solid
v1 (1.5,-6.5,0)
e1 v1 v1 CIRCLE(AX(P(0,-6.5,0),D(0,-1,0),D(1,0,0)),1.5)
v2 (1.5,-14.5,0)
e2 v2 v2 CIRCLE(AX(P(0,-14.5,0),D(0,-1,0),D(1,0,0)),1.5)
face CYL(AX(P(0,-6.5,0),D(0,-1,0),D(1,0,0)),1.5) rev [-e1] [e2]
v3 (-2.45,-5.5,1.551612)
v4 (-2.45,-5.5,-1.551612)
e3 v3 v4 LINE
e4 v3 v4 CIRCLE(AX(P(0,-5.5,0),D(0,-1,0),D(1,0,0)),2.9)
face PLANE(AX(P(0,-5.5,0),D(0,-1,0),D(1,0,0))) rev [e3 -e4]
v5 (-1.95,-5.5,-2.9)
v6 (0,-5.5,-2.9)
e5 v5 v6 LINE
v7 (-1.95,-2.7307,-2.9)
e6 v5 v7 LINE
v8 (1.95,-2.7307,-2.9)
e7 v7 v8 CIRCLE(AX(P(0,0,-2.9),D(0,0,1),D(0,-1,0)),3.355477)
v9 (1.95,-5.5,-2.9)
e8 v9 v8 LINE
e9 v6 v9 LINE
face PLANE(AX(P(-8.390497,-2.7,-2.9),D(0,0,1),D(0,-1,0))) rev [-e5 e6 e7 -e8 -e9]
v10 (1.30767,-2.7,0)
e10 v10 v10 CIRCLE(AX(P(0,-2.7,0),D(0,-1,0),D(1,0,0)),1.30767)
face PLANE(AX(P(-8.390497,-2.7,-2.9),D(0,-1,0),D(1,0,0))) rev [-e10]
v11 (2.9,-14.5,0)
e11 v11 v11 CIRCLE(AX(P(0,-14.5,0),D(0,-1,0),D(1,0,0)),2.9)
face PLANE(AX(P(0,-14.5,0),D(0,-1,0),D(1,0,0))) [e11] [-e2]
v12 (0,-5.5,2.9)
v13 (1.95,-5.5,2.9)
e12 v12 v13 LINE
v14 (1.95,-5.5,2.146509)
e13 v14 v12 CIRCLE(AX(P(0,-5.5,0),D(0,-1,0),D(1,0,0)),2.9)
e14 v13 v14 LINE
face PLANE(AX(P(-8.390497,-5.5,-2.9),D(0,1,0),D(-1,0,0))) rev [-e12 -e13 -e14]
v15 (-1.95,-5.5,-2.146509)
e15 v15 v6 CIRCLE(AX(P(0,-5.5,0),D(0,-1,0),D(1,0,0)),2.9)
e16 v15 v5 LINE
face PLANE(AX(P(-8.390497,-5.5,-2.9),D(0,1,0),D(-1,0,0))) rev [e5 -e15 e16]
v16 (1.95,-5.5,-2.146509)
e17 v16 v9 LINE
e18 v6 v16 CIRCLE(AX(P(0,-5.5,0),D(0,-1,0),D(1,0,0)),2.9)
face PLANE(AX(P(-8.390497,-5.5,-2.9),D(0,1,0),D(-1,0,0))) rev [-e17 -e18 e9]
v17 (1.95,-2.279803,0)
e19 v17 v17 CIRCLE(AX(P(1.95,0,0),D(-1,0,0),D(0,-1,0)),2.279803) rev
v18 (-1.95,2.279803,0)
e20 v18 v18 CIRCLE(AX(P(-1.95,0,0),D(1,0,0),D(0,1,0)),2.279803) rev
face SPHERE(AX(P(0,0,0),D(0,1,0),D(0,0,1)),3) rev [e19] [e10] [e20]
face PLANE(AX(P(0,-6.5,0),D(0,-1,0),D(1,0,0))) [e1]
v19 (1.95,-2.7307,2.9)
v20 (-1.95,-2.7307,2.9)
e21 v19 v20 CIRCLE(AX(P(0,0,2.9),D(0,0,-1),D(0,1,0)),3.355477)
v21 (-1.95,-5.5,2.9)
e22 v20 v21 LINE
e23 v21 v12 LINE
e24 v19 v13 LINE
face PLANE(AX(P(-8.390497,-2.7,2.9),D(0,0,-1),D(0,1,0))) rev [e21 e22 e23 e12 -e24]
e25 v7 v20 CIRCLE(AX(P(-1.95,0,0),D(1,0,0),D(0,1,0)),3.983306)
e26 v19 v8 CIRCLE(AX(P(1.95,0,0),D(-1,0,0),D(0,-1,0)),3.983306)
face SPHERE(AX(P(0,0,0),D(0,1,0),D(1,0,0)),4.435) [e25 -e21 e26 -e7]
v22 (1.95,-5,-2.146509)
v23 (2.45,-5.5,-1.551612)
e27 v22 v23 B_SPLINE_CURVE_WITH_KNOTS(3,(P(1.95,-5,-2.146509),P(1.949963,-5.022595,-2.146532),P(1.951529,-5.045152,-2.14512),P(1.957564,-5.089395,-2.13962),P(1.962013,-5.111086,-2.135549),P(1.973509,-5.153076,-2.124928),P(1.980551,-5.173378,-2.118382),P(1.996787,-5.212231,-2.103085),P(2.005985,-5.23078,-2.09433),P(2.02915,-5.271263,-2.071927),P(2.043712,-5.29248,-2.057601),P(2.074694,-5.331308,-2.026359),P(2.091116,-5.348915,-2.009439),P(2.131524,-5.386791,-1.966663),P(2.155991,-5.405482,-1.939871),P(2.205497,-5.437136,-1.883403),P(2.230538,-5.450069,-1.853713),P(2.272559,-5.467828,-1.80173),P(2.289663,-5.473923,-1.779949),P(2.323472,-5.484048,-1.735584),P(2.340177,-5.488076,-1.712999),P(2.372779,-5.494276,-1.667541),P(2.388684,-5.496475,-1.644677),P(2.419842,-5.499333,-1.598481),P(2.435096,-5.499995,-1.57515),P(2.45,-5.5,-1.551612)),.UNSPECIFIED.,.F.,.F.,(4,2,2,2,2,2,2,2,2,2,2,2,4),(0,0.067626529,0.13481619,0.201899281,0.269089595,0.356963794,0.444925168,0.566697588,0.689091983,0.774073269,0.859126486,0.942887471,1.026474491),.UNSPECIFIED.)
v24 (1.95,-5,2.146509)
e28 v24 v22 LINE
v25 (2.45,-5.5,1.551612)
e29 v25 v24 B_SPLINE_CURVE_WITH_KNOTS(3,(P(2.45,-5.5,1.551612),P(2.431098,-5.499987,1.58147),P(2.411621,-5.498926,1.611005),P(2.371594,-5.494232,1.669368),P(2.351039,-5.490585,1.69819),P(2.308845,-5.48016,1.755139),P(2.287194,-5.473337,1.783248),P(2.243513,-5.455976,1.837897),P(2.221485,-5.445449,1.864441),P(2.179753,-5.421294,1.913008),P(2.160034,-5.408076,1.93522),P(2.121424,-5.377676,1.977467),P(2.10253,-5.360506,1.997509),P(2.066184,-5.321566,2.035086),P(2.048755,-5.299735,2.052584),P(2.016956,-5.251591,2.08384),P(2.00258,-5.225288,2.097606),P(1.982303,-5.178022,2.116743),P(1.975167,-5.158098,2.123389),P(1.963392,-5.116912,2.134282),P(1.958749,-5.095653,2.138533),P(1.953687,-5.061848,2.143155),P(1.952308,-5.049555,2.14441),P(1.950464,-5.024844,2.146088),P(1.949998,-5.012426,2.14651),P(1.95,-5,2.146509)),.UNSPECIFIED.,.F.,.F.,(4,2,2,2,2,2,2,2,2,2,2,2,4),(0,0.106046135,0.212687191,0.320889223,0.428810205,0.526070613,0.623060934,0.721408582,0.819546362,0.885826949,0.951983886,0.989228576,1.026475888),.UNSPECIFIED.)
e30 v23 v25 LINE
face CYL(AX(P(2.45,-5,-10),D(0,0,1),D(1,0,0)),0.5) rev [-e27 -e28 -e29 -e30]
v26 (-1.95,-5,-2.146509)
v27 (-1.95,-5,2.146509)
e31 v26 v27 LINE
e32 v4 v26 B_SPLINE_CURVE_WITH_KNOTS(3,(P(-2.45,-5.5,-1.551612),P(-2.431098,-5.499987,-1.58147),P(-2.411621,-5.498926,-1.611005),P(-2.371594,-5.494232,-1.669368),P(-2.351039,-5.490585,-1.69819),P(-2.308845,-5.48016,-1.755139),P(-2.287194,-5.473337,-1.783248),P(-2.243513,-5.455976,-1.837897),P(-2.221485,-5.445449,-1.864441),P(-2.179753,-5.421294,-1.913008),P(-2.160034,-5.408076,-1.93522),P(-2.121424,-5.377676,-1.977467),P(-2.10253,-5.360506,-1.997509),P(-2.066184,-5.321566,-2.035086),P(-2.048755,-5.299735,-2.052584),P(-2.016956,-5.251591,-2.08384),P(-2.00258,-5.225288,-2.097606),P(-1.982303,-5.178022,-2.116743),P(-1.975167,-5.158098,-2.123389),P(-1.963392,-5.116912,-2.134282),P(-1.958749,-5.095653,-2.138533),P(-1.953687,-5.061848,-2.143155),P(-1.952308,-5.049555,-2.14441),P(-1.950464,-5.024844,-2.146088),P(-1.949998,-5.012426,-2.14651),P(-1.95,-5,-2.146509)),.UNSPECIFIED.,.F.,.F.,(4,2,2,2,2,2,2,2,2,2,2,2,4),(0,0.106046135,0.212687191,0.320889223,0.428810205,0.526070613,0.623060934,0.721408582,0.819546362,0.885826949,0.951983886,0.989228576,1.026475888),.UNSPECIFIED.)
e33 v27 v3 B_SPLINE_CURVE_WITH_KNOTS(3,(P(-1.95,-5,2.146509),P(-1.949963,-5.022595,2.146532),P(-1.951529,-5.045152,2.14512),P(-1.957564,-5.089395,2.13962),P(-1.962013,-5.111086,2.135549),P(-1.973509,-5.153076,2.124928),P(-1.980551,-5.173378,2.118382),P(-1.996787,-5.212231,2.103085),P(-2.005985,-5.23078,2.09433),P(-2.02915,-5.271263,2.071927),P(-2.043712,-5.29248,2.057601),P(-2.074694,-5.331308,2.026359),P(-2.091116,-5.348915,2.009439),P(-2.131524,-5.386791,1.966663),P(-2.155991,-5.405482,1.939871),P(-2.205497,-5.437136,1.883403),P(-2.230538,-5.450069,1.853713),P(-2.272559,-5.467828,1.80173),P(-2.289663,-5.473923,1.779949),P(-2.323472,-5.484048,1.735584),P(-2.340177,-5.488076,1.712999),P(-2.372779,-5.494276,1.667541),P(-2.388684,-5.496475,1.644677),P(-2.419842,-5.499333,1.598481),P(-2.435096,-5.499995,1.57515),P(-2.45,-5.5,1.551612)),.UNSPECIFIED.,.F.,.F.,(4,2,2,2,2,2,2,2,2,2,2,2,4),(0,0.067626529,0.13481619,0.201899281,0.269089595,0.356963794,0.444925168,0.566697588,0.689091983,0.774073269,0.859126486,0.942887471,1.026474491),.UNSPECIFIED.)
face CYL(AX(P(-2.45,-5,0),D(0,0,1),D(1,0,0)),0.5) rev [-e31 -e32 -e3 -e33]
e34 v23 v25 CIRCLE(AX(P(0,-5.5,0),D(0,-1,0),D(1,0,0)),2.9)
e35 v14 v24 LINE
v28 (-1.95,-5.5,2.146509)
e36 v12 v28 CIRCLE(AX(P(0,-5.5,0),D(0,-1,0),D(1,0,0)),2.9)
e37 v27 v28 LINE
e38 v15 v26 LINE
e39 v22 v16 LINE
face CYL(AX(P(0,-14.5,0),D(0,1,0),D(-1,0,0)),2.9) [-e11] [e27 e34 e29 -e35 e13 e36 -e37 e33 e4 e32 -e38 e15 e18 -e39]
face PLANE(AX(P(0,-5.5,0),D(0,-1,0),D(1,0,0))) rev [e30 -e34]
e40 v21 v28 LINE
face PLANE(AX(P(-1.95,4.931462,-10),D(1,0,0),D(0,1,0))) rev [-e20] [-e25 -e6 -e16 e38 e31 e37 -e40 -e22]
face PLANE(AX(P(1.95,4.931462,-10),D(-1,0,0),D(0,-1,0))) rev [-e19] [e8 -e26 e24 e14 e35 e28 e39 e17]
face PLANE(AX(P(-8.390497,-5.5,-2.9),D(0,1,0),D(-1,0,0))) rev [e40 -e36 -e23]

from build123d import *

# Parameters (mm, degrees)
CUT_EXTRUDE_1_DEPTH = 10
EXTRUDE_2_REACH     = 8.953
SKETCH_4_W          = 5.8
SKETCH_4_H          = 2.8
SKETCH_6_W          = 5.8
SKETCH_6_H          = 2.8
EXTRUDE_4_DEPTH     = 1.95
SKETCH_7_R          = 2.9
EXTRUDE_5_DEPTH     = 9
FILLET_1_R          = 0.5
SKETCH_8_R          = 1.5
CUT_EXTRUDE_2_DEPTH = 8


with BuildPart() as part:
    # 草图1 → 旋转1 (revolve)
    with BuildSketch(Plane.XY):
        with BuildLine():
            Line((0, 4.435), (0, -4.435))
            ThreePointArc((0, -4.435), (4.435, 0), (0, 4.435))
        make_face()
    revolve(axis=Axis((0, 4.435, 0), (0, -1, 0)))

    # 草图2 → 切除-拉伸1 (cut, symmetric)
    with BuildSketch(Plane.XY):
        Polygon((-1.95, 4.9314621), (-1.95, -5.561634077), (-9.481889981, 1.10646475), align=None)
        Polygon((1.95, 4.9314621), (1.95, -5.561634077), (8.441373461, -0.109913717), align=None)
    extrude(amount=CUT_EXTRUDE_1_DEPTH, both=True, mode=Mode.SUBTRACT)

    # 草图3 → 切除-旋转1 (revolve, cut)
    with BuildSketch(Plane.ZY):
        with BuildLine():
            Line((0, 3), (0, -3))
            ThreePointArc((0, -3), (3, 0), (0, 3))
        make_face()
    revolve(axis=Axis((0, 3, 0), (0, -1, 0)), mode=Mode.SUBTRACT)

    # 凸台-拉伸2: up to this face of the body (flat: up to its plane)
    extrude_2_end = Plane(part.part.faces().sort_by_distance((-1.95, 3.870640887, 0))[0])
    # 草图4 → 凸台-拉伸2 (add, up to the picked face)
    with BuildSketch(Plane.ZY, mode=Mode.PRIVATE) as extrude_2_sk1:
        with Locations((0, -4.1)):
            Rectangle(SKETCH_4_W, SKETCH_4_H)
    extrude_2_tool1 = split(extrude(extrude_2_sk1.sketch, amount=EXTRUDE_2_REACH, mode=Mode.PRIVATE), bisect_by=extrude_2_end, keep=Keep.BOTH, mode=Mode.PRIVATE)
    add(extrude_2_tool1.solids().sort_by(Axis((0, -4.1, 0), (-1, 0, 0)))[0])

    # 草图6 → 凸台-拉伸4 (add)
    with BuildSketch(Plane(origin=(1.95, 0, 0), x_dir=(0, 0, -1), z_dir=(1, 0, 0))):
        with Locations((0, -4.1)):
            Rectangle(SKETCH_6_W, SKETCH_6_H)
    extrude(amount=-EXTRUDE_4_DEPTH)

    # 草图7 → 凸台-拉伸5 (add)
    with BuildSketch(Plane.XZ.offset(5.5)):
        with Locations(Location((0, 0, 0), (0, 0, 132.253636979))):
            Circle(SKETCH_7_R)
    extrude(amount=EXTRUDE_5_DEPTH)

    # 圆角1
    # the kernel refuses this fillet: 0.5 mm, written as the material it adds along each edge
    with BuildSketch(Plane(origin=(-1.95, -5.5, 3.396508793), x_dir=(0, 1, 0), z_dir=(0, 0, -1))) as fillet_1_piece_1_section:
        with BuildLine():
            CenterArc((FILLET_1_R, -FILLET_1_R), FILLET_1_R, 90, 90)
            Line((0, -FILLET_1_R), (0, 0))
            Line((0, 0), (FILLET_1_R, 0))
        make_face()
    fillet_1_piece_1 = extrude(amount=6.793017587, mode=Mode.PRIVATE)
    fillet_1_piece_1 = fillet_1_piece_1 & Plane(origin=(0, -5.385657526, 0), x_dir=(-0.6724137930973646, 0, 0.7401754459939985), z_dir=(0, 1, 0)) * Cylinder(2.9, 16, mode=Mode.PRIVATE)
    add(fillet_1_piece_1)
    with BuildSketch(Plane(origin=(1.95, -5.5, -3.396508793), x_dir=(0, 1, 0), z_dir=(0, 0, 1))) as fillet_1_piece_2_section:
        with BuildLine():
            CenterArc((FILLET_1_R, -FILLET_1_R), FILLET_1_R, 90, 90)
            Line((0, -FILLET_1_R), (0, 0))
            Line((0, 0), (FILLET_1_R, 0))
        make_face()
    fillet_1_piece_2 = extrude(amount=6.793017587, mode=Mode.PRIVATE)
    fillet_1_piece_2 = fillet_1_piece_2 & Plane(origin=(0, -5.385657526, 0), x_dir=(-0.6724137930973646, 0, 0.7401754459939985), z_dir=(0, 1, 0)) * Cylinder(2.9, 16, mode=Mode.PRIVATE)
    add(fillet_1_piece_2)

    # 草图8 → 切除-拉伸2 (cut)
    with BuildSketch(Plane.XZ.offset(14.5)):
        Circle(SKETCH_8_R)
    extrude(amount=-CUT_EXTRUDE_2_DEPTH, mode=Mode.SUBTRACT)


solid = part.part
